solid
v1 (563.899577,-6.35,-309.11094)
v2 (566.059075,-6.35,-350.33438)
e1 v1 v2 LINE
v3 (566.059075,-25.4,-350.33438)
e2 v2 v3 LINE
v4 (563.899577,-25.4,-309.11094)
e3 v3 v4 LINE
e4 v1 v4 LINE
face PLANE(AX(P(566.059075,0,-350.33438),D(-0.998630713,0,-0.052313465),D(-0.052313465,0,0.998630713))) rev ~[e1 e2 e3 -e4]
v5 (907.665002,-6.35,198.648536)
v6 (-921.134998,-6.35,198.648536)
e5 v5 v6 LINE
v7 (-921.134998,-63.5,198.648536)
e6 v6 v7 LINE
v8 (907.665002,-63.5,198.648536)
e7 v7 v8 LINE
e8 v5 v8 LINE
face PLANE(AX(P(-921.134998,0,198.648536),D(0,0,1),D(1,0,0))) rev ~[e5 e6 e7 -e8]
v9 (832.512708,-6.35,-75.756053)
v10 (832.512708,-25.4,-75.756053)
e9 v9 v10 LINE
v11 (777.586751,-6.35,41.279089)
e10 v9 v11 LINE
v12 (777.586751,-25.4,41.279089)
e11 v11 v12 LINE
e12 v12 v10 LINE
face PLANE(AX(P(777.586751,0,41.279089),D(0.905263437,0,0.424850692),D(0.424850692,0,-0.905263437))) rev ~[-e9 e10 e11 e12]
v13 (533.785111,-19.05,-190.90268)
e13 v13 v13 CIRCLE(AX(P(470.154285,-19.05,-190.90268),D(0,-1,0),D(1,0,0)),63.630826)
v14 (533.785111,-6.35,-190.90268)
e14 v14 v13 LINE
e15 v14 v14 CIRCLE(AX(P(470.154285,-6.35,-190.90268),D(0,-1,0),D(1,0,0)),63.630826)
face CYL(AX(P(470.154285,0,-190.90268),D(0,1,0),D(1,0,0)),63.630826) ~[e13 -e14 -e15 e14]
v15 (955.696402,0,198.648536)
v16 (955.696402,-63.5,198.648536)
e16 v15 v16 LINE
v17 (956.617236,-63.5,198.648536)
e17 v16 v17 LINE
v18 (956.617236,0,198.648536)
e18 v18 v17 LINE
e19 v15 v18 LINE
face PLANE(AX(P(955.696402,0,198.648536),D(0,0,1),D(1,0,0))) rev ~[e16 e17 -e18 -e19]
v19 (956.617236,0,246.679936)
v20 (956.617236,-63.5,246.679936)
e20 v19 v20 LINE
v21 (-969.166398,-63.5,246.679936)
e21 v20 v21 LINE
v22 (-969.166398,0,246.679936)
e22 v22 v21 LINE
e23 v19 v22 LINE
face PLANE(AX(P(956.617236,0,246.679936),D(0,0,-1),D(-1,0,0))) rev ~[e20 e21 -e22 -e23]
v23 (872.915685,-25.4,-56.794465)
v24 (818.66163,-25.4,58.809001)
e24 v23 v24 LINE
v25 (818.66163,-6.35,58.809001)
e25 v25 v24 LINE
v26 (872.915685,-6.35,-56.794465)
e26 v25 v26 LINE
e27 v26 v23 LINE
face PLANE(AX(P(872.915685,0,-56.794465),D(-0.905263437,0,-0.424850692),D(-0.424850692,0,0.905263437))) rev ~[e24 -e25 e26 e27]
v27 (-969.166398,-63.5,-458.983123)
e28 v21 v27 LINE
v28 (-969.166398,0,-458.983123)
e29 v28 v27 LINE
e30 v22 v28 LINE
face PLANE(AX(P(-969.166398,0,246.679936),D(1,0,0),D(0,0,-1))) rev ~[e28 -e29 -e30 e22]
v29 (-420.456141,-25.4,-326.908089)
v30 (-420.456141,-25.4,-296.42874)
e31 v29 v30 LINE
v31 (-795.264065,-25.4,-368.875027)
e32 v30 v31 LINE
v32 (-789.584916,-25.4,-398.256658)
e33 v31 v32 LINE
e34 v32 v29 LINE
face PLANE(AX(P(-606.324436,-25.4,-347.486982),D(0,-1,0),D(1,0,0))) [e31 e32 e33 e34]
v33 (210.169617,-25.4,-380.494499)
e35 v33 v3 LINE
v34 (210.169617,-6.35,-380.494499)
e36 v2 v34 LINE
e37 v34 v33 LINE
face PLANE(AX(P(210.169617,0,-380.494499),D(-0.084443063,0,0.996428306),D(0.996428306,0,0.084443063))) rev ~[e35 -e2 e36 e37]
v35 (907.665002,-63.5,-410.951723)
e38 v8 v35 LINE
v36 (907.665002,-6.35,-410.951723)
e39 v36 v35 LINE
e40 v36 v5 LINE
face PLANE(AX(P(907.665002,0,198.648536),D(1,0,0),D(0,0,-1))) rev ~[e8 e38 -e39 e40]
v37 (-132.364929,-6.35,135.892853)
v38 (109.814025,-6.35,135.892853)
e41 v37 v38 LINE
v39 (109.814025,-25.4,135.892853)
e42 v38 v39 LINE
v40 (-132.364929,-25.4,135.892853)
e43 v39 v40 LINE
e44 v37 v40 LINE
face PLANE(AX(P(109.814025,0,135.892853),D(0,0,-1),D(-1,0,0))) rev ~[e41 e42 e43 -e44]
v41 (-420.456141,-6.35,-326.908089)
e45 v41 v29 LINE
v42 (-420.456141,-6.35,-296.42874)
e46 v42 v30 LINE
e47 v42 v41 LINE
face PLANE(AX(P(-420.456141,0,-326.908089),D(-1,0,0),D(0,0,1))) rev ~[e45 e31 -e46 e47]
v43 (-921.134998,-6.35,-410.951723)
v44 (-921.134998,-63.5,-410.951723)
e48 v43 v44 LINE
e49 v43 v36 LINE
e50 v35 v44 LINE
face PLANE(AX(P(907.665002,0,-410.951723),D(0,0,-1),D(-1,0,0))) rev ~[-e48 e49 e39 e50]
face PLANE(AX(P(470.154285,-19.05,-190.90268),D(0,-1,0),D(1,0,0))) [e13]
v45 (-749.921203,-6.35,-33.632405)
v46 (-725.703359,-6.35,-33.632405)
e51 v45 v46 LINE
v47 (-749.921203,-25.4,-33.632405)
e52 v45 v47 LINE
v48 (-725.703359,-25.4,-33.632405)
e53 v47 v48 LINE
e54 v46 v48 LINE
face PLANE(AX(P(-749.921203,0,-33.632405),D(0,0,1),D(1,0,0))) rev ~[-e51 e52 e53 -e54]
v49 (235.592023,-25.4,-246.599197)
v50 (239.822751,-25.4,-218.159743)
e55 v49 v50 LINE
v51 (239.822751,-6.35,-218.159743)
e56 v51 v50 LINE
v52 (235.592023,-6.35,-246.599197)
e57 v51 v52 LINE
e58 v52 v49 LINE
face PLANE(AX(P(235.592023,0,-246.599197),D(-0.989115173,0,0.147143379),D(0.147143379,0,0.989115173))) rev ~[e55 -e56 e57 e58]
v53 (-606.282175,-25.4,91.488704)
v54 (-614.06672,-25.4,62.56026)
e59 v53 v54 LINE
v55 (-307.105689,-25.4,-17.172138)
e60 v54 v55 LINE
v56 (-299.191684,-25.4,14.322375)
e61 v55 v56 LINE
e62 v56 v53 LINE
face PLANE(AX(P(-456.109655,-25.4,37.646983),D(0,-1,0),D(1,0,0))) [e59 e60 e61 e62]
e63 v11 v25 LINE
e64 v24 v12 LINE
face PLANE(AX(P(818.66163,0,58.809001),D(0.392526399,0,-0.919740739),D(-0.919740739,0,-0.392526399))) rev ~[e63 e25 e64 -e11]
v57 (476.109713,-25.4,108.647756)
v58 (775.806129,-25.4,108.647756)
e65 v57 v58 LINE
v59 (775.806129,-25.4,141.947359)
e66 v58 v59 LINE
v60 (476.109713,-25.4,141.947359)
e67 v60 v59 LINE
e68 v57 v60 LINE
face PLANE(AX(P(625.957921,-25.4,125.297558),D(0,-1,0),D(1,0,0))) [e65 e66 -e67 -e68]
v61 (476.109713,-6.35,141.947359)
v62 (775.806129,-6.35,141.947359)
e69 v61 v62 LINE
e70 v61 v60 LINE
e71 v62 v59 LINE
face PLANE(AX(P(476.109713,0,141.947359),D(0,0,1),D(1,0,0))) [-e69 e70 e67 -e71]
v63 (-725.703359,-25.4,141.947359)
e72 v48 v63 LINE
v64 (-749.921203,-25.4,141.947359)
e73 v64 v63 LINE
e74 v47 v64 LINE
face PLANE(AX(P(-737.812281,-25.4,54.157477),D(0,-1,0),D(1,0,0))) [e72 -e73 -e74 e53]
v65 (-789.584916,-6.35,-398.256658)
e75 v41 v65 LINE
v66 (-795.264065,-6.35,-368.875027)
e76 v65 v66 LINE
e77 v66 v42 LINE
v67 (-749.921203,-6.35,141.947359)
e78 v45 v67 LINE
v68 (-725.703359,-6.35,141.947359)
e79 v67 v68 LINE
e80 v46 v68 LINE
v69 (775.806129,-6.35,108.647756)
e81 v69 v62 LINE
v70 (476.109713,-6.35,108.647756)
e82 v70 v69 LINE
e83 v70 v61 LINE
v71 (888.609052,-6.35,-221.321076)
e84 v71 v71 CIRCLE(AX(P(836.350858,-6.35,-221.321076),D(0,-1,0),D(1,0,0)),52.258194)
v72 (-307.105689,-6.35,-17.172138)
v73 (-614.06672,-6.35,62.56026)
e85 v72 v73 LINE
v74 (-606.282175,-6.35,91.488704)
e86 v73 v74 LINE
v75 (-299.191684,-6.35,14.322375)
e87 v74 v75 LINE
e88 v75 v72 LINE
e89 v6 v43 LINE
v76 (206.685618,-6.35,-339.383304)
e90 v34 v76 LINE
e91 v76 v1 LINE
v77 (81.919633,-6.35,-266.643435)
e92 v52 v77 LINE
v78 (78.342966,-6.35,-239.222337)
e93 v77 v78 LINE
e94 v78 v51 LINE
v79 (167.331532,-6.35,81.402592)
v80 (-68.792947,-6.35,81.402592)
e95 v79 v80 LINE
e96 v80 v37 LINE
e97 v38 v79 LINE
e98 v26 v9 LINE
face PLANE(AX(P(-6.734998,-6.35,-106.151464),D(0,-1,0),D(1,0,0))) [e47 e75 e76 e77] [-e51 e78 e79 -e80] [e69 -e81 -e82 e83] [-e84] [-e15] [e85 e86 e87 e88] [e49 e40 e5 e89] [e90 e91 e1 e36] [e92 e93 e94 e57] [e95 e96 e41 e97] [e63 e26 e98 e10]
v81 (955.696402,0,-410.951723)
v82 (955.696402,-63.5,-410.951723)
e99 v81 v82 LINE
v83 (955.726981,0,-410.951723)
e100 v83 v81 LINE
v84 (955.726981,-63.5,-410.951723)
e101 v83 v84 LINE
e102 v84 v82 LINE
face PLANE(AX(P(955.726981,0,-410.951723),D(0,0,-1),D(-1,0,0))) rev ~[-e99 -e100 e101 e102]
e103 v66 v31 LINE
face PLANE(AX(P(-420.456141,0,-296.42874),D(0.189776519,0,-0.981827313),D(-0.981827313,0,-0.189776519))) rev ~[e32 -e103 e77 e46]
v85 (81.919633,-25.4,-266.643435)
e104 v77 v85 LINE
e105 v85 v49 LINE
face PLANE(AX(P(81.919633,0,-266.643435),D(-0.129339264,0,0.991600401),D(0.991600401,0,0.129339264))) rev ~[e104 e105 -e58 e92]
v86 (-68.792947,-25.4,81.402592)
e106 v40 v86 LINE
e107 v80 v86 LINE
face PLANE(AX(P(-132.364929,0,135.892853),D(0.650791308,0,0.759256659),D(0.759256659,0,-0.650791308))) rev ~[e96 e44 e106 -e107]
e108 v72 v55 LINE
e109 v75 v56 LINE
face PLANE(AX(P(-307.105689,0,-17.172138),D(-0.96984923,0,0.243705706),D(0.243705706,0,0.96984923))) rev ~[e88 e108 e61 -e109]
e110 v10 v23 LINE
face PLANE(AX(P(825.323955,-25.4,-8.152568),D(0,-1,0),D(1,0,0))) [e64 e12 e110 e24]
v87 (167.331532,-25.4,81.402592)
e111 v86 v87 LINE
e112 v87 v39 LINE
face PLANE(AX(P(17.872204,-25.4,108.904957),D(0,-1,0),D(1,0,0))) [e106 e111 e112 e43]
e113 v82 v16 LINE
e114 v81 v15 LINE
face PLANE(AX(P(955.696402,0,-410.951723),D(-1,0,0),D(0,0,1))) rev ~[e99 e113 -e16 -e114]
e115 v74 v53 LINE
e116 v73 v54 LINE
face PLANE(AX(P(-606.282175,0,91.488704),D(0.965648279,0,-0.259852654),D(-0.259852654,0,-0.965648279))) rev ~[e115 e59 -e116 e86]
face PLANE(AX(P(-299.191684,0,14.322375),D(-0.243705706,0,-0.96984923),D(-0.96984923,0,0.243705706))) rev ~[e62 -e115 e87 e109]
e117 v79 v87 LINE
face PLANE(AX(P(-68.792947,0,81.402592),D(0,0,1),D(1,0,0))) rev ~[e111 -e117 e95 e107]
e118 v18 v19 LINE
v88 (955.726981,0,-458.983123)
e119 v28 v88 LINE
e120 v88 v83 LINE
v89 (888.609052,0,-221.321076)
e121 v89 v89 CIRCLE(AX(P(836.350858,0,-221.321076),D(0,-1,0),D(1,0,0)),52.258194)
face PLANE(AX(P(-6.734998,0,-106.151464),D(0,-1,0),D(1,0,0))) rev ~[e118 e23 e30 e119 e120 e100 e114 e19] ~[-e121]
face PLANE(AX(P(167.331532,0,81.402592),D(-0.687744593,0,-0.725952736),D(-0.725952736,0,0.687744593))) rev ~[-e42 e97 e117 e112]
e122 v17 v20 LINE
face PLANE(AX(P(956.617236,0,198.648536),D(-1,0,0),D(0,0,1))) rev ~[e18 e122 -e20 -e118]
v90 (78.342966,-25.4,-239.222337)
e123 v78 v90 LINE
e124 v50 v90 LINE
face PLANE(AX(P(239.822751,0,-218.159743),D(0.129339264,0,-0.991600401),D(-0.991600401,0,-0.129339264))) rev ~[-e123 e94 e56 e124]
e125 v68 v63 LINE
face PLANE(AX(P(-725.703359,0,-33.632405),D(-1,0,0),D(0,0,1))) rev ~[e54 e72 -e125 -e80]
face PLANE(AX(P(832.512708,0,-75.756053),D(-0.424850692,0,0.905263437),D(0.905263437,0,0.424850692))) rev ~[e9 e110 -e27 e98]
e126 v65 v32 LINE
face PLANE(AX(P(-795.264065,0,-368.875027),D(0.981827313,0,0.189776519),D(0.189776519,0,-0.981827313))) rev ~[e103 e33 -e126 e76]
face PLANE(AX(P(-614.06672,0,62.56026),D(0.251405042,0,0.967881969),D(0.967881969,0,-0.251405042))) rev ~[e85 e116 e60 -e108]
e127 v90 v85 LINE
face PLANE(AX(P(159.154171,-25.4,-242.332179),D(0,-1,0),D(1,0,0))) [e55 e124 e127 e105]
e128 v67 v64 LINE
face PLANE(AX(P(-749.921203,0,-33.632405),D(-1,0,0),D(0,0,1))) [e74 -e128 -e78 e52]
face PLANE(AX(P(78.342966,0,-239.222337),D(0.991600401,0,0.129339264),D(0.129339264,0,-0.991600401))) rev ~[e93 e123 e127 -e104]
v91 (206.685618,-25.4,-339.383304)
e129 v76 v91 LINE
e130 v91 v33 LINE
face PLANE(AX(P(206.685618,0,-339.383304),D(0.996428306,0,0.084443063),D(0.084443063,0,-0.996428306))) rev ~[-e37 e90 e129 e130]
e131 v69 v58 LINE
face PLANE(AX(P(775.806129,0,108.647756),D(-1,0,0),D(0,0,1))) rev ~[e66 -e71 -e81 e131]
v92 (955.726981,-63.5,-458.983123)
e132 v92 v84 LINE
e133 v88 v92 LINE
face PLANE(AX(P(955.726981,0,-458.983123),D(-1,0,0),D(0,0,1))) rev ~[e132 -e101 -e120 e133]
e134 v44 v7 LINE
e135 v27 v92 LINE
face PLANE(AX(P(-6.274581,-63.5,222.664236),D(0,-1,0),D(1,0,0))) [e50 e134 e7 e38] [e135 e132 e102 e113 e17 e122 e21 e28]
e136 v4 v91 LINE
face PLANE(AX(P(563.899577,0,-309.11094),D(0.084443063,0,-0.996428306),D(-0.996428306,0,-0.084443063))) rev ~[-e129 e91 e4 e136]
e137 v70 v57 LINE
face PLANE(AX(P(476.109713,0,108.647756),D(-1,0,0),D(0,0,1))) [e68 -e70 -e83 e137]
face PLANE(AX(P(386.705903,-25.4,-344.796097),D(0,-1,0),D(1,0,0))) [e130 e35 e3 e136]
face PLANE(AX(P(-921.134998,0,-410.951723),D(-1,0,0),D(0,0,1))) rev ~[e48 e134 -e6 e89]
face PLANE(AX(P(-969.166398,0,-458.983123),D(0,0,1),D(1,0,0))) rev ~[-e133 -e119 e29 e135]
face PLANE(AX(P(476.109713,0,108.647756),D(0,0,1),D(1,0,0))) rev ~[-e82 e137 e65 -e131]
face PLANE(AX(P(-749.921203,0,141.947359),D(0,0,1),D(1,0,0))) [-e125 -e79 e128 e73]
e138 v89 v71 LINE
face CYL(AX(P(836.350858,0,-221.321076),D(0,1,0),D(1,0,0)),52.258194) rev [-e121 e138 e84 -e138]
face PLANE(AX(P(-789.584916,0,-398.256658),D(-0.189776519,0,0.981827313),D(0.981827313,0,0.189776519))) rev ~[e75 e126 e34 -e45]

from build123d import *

# Parameters (mm, degrees)
F1_DEPTH = 63.5
F0_R     = 63.6308259599
F0_R_2   = 52.2581940634
F0_W     = 24.2178440094
F0_H     = 175.5797639489
F0_W_2   = 299.6964156628
F0_H_2   = 33.2996025681
F2_DEPTH = 6.35
F5_DEPTH = 25.4
F6_DEPTH = 19.05


# Not quite as in the source:
# - the program builds the solid bodies; features that only make, move or delete a surface that nothing else refers to are left out


with BuildPart() as f1:
    # F0 (on Front) → F1 (new body)
    with BuildSketch(Plane.XZ):
        Polygon((-969.1663980484, 198.6485360199), (-921.1349980484, 198.6485360199), (907.6650019516, 198.6485360199), (955.6964019516, 198.6485360199), (956.6172361374, 198.6485360199), (956.6172361374, 246.6799360199), (-969.1663980484, 246.6799360199), align=None)
        Polygon((-921.1349980484, -371.5092837811), (-921.1349980484, 198.6485360199), (-969.1663980484, 198.6485360199), (-969.1663980484, -410.9517233025), (-921.1349980484, -410.9517233025), (-921.1349980484, -410.9514639801), align=None)
        Polygon((-921.1349980484, -410.9517233025), (-969.1663980484, -410.9517233025), (-969.1663980484, -458.9831233025), (955.726981163, -458.9831233025), (955.726981163, -410.9517233025), (955.6964019516, -410.9517233025), (907.6650019516, -410.9517233025), align=None)
        Polygon((955.6964019516, 198.6485360199), (907.6650019516, 198.6485360199), (907.6650019516, -410.9514639801), (907.6650019516, -410.9517233025), (955.6964019516, -410.9517233025), align=None)
    extrude(amount=F1_DEPTH)

    # F0 (on Front) → F2 (join)
    with BuildSketch(Plane.XZ):
        Polygon((907.6650019516, 198.6485360199), (-921.1349980484, 198.6485360199), (-921.1349980484, -371.5092837811), (-921.1349980484, -410.9514639801), (-31.4717553556, -410.9514639801), (907.6650019516, -410.9514639801), align=None)
        Polygon((-789.5849161051, -398.2566583191), (-795.2640652657, -368.8750267029), (-420.4561412334, -296.4287400246), (-420.4561412334, -326.9080892764), align=None, mode=Mode.SUBTRACT)
        Polygon((210.169616585, -380.4944990589), (206.6856175661, -339.3833041191), (563.899576664, -309.1109395027), (566.059074651, -350.3343802749), align=None, mode=Mode.SUBTRACT)
        Polygon((235.5920225382, -246.5991973877), (81.9196328521, -266.643434763), (78.3429656397, -239.222336751), (239.8227507102, -218.1597428141), align=None, mode=Mode.SUBTRACT)
        with Locations((470.1542854309, -190.9026801586)):
            Circle(F0_R, mode=Mode.SUBTRACT)
        with Locations((836.3508582115, -221.3210761547)):
            Circle(F0_R_2, mode=Mode.SUBTRACT)
        with Locations((-737.8122806549, 54.1574768722)):
            Rectangle(F0_W, F0_H, mode=Mode.SUBTRACT)
        Polygon((-614.0667200089, 62.5602602959), (-606.2821745872, 91.4887040854), (-299.1916835308, 14.3223749474), (-307.1056894279, -17.1721380653), align=None, mode=Mode.SUBTRACT)
        Polygon((777.5867510857, 41.2790888272), (818.6616301537, 58.8090009987), (872.9156851768, -56.7944645882), (832.5127084301, -75.7560529142), align=None, mode=Mode.SUBTRACT)
        Polygon((-132.3649287224, 135.8928531408), (109.8140254617, 135.8928531408), (167.3315316439, 81.402592361), (-68.7929466367, 81.402592361), align=None, mode=Mode.SUBTRACT)
        with Locations((625.9579211473, 125.2975575626)):
            Rectangle(F0_W_2, F0_H_2, mode=Mode.SUBTRACT)
        Polygon((907.6650019516, -410.9517233025), (907.6650019516, -410.9514639801), (-31.4717553556, -410.9514639801), (-921.1349980484, -410.9514639801), (-921.1349980484, -410.9517233025), align=None)
    extrude(amount=F2_DEPTH)

    # F0 (on Front) → F5 (join)
    with BuildSketch(Plane.XZ):
        with Locations((625.9579211473, 125.2975575626)):
            Rectangle(F0_W_2, F0_H_2)
        Polygon((167.3315316439, 81.402592361), (109.8140254617, 135.8928531408), (-132.3649287224, 135.8928531408), (-68.7929466367, 81.402592361), align=None)
        Polygon((-299.1916835308, 14.3223749474), (-606.2821745872, 91.4887040854), (-614.0667200089, 62.5602602959), (-307.1056894279, -17.1721380653), align=None)
        Polygon((-420.4561412334, -296.4287400246), (-795.2640652657, -368.8750267029), (-789.5849161051, -398.2566583191), (-420.4561412334, -326.9080892764), align=None)
        Polygon((78.3429656397, -239.222336751), (81.9196328521, -266.643434763), (235.5920225382, -246.5991973877), (239.8227507102, -218.1597428141), align=None)
        Polygon((563.899576664, -309.1109395027), (206.6856175661, -339.3833041191), (210.169616585, -380.4944990589), (566.059074651, -350.3343802749), align=None)
        with Locations((-737.8122806549, 54.1574768722)):
            Rectangle(F0_W, F0_H)
        Polygon((872.9156851768, -56.7944645882), (818.6616301537, 58.8090009987), (777.5867510857, 41.2790888272), (832.5127084301, -75.7560529142), align=None)
    extrude(amount=F5_DEPTH)

    # F0 (on Front) → F6 (join)
    with BuildSketch(Plane.XZ):
        with Locations((470.1542854309, -190.9026801586)):
            Circle(F0_R)
    extrude(amount=F6_DEPTH)


solid = f1.part
